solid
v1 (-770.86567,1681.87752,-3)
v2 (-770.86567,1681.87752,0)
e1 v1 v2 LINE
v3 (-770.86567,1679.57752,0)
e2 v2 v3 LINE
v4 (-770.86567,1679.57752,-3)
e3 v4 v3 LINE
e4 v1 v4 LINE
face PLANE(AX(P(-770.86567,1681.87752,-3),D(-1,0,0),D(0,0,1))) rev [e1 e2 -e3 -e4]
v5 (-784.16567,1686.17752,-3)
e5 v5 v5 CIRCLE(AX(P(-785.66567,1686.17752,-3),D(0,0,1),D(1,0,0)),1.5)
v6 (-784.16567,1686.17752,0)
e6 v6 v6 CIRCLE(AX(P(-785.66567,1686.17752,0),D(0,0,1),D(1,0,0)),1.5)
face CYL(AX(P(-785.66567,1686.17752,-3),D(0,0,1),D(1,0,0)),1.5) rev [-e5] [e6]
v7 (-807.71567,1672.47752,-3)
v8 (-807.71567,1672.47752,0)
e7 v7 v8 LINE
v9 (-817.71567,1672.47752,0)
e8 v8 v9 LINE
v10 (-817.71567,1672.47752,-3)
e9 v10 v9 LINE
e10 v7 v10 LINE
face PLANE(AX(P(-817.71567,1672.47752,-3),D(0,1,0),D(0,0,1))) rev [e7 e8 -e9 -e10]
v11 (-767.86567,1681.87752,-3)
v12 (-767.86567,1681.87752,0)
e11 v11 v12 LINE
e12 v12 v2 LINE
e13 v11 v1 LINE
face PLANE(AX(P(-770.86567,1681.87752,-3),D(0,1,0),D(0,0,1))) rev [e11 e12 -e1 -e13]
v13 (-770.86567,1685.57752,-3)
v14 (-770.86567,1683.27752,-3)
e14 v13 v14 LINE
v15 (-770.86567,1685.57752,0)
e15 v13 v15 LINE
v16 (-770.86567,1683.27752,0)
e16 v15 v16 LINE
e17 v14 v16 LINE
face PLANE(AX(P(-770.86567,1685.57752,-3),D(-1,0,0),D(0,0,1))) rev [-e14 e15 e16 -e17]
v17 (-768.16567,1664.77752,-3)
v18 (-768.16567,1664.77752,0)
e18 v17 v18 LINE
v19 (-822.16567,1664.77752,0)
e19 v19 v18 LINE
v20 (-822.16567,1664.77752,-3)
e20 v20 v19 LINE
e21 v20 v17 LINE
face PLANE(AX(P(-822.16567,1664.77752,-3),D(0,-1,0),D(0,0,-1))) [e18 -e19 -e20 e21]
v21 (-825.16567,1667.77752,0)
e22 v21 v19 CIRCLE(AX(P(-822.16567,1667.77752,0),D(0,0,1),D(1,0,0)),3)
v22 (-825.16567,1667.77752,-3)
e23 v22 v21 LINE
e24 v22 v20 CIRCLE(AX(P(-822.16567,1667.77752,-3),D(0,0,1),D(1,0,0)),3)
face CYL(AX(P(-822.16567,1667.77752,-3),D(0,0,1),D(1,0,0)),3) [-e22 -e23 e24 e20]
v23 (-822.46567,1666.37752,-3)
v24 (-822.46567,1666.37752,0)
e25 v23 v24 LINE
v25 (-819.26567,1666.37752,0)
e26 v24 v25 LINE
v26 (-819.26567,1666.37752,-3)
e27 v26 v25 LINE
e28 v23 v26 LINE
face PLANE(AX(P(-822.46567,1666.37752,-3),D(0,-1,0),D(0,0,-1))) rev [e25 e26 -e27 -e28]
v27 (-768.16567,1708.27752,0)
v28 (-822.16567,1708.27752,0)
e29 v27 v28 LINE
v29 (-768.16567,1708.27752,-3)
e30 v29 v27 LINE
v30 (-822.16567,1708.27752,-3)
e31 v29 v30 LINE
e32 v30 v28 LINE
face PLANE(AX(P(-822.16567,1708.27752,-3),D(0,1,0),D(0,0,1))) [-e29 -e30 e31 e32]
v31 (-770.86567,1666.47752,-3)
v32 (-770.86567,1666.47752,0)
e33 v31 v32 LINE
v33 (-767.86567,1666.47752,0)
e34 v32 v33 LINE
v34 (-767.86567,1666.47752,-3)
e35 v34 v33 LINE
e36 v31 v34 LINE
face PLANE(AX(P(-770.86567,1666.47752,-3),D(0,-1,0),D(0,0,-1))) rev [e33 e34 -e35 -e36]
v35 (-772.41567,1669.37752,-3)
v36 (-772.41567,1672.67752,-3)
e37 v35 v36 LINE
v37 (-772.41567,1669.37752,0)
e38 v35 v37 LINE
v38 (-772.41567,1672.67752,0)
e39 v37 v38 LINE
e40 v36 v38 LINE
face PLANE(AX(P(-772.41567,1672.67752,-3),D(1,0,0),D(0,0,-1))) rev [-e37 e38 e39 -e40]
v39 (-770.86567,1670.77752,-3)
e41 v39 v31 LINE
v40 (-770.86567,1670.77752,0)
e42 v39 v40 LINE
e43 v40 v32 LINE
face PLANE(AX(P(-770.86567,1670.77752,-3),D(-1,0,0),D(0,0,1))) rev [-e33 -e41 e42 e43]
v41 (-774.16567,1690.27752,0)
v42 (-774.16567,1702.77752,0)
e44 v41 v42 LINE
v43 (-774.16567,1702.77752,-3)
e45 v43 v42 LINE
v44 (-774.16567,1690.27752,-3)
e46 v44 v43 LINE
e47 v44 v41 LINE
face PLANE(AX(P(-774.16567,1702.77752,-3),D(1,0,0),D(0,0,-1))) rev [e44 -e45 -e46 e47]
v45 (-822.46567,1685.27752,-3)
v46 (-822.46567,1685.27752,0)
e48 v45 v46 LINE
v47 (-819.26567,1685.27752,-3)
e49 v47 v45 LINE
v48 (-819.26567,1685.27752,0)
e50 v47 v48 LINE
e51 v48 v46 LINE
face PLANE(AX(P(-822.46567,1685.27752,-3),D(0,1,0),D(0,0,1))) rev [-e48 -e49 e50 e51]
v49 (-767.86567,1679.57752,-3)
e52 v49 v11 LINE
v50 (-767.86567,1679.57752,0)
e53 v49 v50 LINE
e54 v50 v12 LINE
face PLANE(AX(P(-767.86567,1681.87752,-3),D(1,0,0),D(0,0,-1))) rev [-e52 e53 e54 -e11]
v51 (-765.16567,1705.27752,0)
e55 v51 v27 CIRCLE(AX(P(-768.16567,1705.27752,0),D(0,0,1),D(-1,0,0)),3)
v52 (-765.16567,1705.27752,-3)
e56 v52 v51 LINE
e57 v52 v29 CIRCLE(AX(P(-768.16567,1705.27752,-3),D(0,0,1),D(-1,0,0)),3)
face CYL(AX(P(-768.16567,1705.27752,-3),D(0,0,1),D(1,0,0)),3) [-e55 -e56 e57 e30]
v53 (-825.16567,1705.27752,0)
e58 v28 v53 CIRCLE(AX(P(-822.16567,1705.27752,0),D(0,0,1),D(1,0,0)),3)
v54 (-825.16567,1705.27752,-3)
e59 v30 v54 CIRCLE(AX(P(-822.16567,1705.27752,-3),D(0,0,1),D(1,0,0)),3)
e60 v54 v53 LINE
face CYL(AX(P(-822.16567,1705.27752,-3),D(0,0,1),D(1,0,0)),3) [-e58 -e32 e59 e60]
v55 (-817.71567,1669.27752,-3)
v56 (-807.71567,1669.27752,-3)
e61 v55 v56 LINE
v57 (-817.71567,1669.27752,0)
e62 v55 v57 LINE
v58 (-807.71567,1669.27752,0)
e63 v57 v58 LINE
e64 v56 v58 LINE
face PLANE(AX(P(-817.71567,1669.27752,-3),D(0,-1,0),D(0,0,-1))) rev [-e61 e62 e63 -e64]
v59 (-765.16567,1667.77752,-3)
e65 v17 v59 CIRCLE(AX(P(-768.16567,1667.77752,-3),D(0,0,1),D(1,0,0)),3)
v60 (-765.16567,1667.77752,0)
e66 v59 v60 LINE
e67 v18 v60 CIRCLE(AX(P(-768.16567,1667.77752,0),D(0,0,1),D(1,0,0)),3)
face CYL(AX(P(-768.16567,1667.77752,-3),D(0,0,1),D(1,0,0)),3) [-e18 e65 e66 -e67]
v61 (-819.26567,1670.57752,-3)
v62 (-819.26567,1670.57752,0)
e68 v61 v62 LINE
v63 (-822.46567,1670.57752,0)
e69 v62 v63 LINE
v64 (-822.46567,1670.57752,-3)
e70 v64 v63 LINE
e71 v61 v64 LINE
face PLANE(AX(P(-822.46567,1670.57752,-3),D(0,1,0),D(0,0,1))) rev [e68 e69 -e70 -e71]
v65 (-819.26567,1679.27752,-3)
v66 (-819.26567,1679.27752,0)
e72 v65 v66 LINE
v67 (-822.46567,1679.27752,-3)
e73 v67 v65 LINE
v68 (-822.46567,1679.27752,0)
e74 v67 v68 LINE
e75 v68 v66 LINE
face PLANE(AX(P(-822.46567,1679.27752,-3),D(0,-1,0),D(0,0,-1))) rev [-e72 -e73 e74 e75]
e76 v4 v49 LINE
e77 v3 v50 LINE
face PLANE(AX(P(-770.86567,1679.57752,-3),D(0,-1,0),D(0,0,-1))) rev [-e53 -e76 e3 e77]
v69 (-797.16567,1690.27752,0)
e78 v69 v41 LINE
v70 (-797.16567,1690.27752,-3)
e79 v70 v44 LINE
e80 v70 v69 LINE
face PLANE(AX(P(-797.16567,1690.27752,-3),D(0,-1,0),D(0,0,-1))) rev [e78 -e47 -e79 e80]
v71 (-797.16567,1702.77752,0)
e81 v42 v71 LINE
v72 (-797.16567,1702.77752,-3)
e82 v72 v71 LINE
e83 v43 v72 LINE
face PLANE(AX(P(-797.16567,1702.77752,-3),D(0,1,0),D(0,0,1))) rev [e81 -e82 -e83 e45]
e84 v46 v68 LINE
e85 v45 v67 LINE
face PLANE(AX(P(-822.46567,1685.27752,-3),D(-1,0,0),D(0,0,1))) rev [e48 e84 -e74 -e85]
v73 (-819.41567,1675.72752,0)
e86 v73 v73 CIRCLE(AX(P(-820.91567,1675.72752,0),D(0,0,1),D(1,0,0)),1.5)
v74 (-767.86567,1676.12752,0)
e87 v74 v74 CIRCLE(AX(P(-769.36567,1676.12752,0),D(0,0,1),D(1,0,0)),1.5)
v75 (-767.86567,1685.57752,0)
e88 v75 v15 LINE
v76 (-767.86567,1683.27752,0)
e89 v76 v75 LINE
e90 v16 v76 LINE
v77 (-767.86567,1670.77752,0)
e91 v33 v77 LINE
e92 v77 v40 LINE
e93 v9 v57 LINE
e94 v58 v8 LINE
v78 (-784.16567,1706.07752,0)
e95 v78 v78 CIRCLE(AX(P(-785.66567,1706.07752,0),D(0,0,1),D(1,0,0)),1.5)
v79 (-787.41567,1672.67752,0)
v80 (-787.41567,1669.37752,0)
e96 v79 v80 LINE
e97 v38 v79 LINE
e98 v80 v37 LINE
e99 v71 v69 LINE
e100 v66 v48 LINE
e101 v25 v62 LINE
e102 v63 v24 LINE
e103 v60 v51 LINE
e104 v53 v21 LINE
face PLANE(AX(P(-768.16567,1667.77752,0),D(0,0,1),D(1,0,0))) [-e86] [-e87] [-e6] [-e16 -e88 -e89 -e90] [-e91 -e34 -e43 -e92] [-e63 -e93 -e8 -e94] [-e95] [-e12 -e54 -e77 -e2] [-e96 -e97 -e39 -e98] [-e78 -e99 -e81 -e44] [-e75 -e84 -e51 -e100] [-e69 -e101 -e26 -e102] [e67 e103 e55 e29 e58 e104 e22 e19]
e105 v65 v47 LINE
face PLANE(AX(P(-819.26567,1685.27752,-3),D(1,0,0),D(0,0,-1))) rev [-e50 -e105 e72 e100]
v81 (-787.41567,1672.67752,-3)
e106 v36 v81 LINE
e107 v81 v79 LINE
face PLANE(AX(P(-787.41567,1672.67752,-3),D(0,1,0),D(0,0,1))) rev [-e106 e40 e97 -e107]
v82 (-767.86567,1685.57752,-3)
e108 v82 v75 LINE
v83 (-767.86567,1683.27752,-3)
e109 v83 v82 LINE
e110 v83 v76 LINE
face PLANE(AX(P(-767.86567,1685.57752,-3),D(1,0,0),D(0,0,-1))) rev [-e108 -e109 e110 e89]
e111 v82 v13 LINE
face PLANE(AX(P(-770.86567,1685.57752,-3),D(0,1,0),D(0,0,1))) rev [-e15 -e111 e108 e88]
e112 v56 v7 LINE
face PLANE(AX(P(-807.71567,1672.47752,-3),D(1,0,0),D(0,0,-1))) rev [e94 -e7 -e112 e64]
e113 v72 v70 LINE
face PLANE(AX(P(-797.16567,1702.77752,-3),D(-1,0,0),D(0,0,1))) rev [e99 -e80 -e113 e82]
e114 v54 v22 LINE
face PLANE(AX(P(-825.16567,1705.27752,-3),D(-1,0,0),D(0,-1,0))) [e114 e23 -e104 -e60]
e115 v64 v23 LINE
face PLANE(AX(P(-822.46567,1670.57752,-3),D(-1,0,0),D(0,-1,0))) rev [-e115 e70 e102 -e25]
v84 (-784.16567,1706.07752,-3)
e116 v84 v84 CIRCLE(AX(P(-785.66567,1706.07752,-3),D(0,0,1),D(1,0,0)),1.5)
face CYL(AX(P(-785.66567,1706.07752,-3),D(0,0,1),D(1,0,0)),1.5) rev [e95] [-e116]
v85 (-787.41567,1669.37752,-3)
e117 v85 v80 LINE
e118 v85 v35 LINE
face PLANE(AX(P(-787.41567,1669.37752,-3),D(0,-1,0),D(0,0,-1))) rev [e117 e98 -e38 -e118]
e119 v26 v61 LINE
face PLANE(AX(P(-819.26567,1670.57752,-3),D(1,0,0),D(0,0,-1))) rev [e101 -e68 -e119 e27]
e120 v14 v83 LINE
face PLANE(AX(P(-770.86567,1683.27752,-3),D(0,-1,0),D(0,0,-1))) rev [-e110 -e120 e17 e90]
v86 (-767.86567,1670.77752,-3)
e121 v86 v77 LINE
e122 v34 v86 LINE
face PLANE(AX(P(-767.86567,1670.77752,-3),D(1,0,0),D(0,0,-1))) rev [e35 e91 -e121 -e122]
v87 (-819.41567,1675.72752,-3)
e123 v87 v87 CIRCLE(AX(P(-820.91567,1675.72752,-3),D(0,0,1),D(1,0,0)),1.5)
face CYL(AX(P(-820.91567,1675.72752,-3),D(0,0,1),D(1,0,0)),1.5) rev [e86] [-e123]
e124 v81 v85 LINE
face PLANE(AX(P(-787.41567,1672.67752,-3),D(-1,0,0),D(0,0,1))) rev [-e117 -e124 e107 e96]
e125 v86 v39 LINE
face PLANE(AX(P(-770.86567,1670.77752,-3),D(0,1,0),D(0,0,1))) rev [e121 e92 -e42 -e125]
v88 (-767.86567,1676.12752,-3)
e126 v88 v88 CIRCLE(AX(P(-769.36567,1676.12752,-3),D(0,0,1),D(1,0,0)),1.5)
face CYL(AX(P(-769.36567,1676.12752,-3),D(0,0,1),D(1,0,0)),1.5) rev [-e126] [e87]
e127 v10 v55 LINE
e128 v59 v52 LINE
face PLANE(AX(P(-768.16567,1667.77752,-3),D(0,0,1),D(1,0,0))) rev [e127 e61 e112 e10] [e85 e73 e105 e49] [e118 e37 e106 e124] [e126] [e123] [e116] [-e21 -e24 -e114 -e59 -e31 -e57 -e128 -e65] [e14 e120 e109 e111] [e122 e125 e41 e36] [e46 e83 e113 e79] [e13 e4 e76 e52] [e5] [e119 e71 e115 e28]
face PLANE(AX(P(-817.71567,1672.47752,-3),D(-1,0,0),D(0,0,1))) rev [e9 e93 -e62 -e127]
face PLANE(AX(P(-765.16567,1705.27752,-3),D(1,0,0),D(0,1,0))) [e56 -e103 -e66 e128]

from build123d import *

# Parameters (mm, degrees)
ESQUISSE1_R               = 1.5
ESQUISSE1_W               = 23
ESQUISSE1_H               = 12.5
ESQUISSE1_W_2             = 3.2
ESQUISSE1_H_2             = 6
ESQUISSE1_H_3             = 4.2
ESQUISSE1_W_3             = 10
ESQUISSE1_H_4             = 3.2
ESQUISSE1_W_4             = 15
ESQUISSE1_H_5             = 3.3
ESQUISSE1_W_5             = 3
ESQUISSE1_H_6             = 4.3
ESQUISSE1_H_7             = 2.3
T_LE_DE_BASE_PLI_E1_DEPTH = 3


# Sheet-metal steps are written as plain solids
with BuildPart() as part:
    # Esquisse1 → Tôle de base pliée1 (new body)
    with BuildSketch(Plane.XY):
        with BuildLine():
            Line((-822.16567012, 1708.277520055), (-768.16567012, 1708.277520055))
            ThreePointArc((-768.16567012, 1708.277520055), (-766.044349777, 1707.398840398), (-765.16567012, 1705.277520055))
            Line((-765.16567012, 1705.277520055), (-765.16567012, 1667.777520055))
            ThreePointArc((-765.16567012, 1667.777520055), (-766.044349777, 1665.656199711), (-768.16567012, 1664.777520055))
            Line((-768.16567012, 1664.777520055), (-822.16567012, 1664.777520055))
            ThreePointArc((-822.16567012, 1664.777520055), (-824.286990464, 1665.656199711), (-825.16567012, 1667.777520055))
            Line((-825.16567012, 1667.777520055), (-825.16567012, 1705.277520055))
            ThreePointArc((-825.16567012, 1705.277520055), (-824.286990464, 1707.398840398), (-822.16567012, 1708.277520055))
        make_face()
        with Locations((-785.66567012, 1706.077520055)):
            Circle(ESQUISSE1_R, mode=Mode.SUBTRACT)
        with Locations((-785.66567012, 1686.177520055)):
            Circle(ESQUISSE1_R, mode=Mode.SUBTRACT)
        with Locations((-820.91567012, 1675.727520055)):
            Circle(ESQUISSE1_R, mode=Mode.SUBTRACT)
        with Locations((-769.36567012, 1676.127520055)):
            Circle(ESQUISSE1_R, mode=Mode.SUBTRACT)
        with Locations((-785.66567012, 1696.527520055)):
            Rectangle(ESQUISSE1_W, ESQUISSE1_H, mode=Mode.SUBTRACT)
        with Locations((-820.86567012, 1682.277520055)):
            Rectangle(ESQUISSE1_W_2, ESQUISSE1_H_2, mode=Mode.SUBTRACT)
        with Locations((-820.86567012, 1668.477520055)):
            Rectangle(ESQUISSE1_W_2, ESQUISSE1_H_3, mode=Mode.SUBTRACT)
        with Locations((-812.71567012, 1670.877520055)):
            Rectangle(ESQUISSE1_W_3, ESQUISSE1_H_4, mode=Mode.SUBTRACT)
        with Locations((-779.91567012, 1671.027520055)):
            Rectangle(ESQUISSE1_W_4, ESQUISSE1_H_5, mode=Mode.SUBTRACT)
        with Locations((-769.36567012, 1668.627520055)):
            Rectangle(ESQUISSE1_W_5, ESQUISSE1_H_6, mode=Mode.SUBTRACT)
        with Locations((-769.36567012, 1680.727520055)):
            Rectangle(ESQUISSE1_W_5, ESQUISSE1_H_7, mode=Mode.SUBTRACT)
        with Locations((-769.36567012, 1684.427520055)):
            Rectangle(ESQUISSE1_W_5, ESQUISSE1_H_7, mode=Mode.SUBTRACT)
    extrude(amount=-T_LE_DE_BASE_PLI_E1_DEPTH)


solid = part.part
